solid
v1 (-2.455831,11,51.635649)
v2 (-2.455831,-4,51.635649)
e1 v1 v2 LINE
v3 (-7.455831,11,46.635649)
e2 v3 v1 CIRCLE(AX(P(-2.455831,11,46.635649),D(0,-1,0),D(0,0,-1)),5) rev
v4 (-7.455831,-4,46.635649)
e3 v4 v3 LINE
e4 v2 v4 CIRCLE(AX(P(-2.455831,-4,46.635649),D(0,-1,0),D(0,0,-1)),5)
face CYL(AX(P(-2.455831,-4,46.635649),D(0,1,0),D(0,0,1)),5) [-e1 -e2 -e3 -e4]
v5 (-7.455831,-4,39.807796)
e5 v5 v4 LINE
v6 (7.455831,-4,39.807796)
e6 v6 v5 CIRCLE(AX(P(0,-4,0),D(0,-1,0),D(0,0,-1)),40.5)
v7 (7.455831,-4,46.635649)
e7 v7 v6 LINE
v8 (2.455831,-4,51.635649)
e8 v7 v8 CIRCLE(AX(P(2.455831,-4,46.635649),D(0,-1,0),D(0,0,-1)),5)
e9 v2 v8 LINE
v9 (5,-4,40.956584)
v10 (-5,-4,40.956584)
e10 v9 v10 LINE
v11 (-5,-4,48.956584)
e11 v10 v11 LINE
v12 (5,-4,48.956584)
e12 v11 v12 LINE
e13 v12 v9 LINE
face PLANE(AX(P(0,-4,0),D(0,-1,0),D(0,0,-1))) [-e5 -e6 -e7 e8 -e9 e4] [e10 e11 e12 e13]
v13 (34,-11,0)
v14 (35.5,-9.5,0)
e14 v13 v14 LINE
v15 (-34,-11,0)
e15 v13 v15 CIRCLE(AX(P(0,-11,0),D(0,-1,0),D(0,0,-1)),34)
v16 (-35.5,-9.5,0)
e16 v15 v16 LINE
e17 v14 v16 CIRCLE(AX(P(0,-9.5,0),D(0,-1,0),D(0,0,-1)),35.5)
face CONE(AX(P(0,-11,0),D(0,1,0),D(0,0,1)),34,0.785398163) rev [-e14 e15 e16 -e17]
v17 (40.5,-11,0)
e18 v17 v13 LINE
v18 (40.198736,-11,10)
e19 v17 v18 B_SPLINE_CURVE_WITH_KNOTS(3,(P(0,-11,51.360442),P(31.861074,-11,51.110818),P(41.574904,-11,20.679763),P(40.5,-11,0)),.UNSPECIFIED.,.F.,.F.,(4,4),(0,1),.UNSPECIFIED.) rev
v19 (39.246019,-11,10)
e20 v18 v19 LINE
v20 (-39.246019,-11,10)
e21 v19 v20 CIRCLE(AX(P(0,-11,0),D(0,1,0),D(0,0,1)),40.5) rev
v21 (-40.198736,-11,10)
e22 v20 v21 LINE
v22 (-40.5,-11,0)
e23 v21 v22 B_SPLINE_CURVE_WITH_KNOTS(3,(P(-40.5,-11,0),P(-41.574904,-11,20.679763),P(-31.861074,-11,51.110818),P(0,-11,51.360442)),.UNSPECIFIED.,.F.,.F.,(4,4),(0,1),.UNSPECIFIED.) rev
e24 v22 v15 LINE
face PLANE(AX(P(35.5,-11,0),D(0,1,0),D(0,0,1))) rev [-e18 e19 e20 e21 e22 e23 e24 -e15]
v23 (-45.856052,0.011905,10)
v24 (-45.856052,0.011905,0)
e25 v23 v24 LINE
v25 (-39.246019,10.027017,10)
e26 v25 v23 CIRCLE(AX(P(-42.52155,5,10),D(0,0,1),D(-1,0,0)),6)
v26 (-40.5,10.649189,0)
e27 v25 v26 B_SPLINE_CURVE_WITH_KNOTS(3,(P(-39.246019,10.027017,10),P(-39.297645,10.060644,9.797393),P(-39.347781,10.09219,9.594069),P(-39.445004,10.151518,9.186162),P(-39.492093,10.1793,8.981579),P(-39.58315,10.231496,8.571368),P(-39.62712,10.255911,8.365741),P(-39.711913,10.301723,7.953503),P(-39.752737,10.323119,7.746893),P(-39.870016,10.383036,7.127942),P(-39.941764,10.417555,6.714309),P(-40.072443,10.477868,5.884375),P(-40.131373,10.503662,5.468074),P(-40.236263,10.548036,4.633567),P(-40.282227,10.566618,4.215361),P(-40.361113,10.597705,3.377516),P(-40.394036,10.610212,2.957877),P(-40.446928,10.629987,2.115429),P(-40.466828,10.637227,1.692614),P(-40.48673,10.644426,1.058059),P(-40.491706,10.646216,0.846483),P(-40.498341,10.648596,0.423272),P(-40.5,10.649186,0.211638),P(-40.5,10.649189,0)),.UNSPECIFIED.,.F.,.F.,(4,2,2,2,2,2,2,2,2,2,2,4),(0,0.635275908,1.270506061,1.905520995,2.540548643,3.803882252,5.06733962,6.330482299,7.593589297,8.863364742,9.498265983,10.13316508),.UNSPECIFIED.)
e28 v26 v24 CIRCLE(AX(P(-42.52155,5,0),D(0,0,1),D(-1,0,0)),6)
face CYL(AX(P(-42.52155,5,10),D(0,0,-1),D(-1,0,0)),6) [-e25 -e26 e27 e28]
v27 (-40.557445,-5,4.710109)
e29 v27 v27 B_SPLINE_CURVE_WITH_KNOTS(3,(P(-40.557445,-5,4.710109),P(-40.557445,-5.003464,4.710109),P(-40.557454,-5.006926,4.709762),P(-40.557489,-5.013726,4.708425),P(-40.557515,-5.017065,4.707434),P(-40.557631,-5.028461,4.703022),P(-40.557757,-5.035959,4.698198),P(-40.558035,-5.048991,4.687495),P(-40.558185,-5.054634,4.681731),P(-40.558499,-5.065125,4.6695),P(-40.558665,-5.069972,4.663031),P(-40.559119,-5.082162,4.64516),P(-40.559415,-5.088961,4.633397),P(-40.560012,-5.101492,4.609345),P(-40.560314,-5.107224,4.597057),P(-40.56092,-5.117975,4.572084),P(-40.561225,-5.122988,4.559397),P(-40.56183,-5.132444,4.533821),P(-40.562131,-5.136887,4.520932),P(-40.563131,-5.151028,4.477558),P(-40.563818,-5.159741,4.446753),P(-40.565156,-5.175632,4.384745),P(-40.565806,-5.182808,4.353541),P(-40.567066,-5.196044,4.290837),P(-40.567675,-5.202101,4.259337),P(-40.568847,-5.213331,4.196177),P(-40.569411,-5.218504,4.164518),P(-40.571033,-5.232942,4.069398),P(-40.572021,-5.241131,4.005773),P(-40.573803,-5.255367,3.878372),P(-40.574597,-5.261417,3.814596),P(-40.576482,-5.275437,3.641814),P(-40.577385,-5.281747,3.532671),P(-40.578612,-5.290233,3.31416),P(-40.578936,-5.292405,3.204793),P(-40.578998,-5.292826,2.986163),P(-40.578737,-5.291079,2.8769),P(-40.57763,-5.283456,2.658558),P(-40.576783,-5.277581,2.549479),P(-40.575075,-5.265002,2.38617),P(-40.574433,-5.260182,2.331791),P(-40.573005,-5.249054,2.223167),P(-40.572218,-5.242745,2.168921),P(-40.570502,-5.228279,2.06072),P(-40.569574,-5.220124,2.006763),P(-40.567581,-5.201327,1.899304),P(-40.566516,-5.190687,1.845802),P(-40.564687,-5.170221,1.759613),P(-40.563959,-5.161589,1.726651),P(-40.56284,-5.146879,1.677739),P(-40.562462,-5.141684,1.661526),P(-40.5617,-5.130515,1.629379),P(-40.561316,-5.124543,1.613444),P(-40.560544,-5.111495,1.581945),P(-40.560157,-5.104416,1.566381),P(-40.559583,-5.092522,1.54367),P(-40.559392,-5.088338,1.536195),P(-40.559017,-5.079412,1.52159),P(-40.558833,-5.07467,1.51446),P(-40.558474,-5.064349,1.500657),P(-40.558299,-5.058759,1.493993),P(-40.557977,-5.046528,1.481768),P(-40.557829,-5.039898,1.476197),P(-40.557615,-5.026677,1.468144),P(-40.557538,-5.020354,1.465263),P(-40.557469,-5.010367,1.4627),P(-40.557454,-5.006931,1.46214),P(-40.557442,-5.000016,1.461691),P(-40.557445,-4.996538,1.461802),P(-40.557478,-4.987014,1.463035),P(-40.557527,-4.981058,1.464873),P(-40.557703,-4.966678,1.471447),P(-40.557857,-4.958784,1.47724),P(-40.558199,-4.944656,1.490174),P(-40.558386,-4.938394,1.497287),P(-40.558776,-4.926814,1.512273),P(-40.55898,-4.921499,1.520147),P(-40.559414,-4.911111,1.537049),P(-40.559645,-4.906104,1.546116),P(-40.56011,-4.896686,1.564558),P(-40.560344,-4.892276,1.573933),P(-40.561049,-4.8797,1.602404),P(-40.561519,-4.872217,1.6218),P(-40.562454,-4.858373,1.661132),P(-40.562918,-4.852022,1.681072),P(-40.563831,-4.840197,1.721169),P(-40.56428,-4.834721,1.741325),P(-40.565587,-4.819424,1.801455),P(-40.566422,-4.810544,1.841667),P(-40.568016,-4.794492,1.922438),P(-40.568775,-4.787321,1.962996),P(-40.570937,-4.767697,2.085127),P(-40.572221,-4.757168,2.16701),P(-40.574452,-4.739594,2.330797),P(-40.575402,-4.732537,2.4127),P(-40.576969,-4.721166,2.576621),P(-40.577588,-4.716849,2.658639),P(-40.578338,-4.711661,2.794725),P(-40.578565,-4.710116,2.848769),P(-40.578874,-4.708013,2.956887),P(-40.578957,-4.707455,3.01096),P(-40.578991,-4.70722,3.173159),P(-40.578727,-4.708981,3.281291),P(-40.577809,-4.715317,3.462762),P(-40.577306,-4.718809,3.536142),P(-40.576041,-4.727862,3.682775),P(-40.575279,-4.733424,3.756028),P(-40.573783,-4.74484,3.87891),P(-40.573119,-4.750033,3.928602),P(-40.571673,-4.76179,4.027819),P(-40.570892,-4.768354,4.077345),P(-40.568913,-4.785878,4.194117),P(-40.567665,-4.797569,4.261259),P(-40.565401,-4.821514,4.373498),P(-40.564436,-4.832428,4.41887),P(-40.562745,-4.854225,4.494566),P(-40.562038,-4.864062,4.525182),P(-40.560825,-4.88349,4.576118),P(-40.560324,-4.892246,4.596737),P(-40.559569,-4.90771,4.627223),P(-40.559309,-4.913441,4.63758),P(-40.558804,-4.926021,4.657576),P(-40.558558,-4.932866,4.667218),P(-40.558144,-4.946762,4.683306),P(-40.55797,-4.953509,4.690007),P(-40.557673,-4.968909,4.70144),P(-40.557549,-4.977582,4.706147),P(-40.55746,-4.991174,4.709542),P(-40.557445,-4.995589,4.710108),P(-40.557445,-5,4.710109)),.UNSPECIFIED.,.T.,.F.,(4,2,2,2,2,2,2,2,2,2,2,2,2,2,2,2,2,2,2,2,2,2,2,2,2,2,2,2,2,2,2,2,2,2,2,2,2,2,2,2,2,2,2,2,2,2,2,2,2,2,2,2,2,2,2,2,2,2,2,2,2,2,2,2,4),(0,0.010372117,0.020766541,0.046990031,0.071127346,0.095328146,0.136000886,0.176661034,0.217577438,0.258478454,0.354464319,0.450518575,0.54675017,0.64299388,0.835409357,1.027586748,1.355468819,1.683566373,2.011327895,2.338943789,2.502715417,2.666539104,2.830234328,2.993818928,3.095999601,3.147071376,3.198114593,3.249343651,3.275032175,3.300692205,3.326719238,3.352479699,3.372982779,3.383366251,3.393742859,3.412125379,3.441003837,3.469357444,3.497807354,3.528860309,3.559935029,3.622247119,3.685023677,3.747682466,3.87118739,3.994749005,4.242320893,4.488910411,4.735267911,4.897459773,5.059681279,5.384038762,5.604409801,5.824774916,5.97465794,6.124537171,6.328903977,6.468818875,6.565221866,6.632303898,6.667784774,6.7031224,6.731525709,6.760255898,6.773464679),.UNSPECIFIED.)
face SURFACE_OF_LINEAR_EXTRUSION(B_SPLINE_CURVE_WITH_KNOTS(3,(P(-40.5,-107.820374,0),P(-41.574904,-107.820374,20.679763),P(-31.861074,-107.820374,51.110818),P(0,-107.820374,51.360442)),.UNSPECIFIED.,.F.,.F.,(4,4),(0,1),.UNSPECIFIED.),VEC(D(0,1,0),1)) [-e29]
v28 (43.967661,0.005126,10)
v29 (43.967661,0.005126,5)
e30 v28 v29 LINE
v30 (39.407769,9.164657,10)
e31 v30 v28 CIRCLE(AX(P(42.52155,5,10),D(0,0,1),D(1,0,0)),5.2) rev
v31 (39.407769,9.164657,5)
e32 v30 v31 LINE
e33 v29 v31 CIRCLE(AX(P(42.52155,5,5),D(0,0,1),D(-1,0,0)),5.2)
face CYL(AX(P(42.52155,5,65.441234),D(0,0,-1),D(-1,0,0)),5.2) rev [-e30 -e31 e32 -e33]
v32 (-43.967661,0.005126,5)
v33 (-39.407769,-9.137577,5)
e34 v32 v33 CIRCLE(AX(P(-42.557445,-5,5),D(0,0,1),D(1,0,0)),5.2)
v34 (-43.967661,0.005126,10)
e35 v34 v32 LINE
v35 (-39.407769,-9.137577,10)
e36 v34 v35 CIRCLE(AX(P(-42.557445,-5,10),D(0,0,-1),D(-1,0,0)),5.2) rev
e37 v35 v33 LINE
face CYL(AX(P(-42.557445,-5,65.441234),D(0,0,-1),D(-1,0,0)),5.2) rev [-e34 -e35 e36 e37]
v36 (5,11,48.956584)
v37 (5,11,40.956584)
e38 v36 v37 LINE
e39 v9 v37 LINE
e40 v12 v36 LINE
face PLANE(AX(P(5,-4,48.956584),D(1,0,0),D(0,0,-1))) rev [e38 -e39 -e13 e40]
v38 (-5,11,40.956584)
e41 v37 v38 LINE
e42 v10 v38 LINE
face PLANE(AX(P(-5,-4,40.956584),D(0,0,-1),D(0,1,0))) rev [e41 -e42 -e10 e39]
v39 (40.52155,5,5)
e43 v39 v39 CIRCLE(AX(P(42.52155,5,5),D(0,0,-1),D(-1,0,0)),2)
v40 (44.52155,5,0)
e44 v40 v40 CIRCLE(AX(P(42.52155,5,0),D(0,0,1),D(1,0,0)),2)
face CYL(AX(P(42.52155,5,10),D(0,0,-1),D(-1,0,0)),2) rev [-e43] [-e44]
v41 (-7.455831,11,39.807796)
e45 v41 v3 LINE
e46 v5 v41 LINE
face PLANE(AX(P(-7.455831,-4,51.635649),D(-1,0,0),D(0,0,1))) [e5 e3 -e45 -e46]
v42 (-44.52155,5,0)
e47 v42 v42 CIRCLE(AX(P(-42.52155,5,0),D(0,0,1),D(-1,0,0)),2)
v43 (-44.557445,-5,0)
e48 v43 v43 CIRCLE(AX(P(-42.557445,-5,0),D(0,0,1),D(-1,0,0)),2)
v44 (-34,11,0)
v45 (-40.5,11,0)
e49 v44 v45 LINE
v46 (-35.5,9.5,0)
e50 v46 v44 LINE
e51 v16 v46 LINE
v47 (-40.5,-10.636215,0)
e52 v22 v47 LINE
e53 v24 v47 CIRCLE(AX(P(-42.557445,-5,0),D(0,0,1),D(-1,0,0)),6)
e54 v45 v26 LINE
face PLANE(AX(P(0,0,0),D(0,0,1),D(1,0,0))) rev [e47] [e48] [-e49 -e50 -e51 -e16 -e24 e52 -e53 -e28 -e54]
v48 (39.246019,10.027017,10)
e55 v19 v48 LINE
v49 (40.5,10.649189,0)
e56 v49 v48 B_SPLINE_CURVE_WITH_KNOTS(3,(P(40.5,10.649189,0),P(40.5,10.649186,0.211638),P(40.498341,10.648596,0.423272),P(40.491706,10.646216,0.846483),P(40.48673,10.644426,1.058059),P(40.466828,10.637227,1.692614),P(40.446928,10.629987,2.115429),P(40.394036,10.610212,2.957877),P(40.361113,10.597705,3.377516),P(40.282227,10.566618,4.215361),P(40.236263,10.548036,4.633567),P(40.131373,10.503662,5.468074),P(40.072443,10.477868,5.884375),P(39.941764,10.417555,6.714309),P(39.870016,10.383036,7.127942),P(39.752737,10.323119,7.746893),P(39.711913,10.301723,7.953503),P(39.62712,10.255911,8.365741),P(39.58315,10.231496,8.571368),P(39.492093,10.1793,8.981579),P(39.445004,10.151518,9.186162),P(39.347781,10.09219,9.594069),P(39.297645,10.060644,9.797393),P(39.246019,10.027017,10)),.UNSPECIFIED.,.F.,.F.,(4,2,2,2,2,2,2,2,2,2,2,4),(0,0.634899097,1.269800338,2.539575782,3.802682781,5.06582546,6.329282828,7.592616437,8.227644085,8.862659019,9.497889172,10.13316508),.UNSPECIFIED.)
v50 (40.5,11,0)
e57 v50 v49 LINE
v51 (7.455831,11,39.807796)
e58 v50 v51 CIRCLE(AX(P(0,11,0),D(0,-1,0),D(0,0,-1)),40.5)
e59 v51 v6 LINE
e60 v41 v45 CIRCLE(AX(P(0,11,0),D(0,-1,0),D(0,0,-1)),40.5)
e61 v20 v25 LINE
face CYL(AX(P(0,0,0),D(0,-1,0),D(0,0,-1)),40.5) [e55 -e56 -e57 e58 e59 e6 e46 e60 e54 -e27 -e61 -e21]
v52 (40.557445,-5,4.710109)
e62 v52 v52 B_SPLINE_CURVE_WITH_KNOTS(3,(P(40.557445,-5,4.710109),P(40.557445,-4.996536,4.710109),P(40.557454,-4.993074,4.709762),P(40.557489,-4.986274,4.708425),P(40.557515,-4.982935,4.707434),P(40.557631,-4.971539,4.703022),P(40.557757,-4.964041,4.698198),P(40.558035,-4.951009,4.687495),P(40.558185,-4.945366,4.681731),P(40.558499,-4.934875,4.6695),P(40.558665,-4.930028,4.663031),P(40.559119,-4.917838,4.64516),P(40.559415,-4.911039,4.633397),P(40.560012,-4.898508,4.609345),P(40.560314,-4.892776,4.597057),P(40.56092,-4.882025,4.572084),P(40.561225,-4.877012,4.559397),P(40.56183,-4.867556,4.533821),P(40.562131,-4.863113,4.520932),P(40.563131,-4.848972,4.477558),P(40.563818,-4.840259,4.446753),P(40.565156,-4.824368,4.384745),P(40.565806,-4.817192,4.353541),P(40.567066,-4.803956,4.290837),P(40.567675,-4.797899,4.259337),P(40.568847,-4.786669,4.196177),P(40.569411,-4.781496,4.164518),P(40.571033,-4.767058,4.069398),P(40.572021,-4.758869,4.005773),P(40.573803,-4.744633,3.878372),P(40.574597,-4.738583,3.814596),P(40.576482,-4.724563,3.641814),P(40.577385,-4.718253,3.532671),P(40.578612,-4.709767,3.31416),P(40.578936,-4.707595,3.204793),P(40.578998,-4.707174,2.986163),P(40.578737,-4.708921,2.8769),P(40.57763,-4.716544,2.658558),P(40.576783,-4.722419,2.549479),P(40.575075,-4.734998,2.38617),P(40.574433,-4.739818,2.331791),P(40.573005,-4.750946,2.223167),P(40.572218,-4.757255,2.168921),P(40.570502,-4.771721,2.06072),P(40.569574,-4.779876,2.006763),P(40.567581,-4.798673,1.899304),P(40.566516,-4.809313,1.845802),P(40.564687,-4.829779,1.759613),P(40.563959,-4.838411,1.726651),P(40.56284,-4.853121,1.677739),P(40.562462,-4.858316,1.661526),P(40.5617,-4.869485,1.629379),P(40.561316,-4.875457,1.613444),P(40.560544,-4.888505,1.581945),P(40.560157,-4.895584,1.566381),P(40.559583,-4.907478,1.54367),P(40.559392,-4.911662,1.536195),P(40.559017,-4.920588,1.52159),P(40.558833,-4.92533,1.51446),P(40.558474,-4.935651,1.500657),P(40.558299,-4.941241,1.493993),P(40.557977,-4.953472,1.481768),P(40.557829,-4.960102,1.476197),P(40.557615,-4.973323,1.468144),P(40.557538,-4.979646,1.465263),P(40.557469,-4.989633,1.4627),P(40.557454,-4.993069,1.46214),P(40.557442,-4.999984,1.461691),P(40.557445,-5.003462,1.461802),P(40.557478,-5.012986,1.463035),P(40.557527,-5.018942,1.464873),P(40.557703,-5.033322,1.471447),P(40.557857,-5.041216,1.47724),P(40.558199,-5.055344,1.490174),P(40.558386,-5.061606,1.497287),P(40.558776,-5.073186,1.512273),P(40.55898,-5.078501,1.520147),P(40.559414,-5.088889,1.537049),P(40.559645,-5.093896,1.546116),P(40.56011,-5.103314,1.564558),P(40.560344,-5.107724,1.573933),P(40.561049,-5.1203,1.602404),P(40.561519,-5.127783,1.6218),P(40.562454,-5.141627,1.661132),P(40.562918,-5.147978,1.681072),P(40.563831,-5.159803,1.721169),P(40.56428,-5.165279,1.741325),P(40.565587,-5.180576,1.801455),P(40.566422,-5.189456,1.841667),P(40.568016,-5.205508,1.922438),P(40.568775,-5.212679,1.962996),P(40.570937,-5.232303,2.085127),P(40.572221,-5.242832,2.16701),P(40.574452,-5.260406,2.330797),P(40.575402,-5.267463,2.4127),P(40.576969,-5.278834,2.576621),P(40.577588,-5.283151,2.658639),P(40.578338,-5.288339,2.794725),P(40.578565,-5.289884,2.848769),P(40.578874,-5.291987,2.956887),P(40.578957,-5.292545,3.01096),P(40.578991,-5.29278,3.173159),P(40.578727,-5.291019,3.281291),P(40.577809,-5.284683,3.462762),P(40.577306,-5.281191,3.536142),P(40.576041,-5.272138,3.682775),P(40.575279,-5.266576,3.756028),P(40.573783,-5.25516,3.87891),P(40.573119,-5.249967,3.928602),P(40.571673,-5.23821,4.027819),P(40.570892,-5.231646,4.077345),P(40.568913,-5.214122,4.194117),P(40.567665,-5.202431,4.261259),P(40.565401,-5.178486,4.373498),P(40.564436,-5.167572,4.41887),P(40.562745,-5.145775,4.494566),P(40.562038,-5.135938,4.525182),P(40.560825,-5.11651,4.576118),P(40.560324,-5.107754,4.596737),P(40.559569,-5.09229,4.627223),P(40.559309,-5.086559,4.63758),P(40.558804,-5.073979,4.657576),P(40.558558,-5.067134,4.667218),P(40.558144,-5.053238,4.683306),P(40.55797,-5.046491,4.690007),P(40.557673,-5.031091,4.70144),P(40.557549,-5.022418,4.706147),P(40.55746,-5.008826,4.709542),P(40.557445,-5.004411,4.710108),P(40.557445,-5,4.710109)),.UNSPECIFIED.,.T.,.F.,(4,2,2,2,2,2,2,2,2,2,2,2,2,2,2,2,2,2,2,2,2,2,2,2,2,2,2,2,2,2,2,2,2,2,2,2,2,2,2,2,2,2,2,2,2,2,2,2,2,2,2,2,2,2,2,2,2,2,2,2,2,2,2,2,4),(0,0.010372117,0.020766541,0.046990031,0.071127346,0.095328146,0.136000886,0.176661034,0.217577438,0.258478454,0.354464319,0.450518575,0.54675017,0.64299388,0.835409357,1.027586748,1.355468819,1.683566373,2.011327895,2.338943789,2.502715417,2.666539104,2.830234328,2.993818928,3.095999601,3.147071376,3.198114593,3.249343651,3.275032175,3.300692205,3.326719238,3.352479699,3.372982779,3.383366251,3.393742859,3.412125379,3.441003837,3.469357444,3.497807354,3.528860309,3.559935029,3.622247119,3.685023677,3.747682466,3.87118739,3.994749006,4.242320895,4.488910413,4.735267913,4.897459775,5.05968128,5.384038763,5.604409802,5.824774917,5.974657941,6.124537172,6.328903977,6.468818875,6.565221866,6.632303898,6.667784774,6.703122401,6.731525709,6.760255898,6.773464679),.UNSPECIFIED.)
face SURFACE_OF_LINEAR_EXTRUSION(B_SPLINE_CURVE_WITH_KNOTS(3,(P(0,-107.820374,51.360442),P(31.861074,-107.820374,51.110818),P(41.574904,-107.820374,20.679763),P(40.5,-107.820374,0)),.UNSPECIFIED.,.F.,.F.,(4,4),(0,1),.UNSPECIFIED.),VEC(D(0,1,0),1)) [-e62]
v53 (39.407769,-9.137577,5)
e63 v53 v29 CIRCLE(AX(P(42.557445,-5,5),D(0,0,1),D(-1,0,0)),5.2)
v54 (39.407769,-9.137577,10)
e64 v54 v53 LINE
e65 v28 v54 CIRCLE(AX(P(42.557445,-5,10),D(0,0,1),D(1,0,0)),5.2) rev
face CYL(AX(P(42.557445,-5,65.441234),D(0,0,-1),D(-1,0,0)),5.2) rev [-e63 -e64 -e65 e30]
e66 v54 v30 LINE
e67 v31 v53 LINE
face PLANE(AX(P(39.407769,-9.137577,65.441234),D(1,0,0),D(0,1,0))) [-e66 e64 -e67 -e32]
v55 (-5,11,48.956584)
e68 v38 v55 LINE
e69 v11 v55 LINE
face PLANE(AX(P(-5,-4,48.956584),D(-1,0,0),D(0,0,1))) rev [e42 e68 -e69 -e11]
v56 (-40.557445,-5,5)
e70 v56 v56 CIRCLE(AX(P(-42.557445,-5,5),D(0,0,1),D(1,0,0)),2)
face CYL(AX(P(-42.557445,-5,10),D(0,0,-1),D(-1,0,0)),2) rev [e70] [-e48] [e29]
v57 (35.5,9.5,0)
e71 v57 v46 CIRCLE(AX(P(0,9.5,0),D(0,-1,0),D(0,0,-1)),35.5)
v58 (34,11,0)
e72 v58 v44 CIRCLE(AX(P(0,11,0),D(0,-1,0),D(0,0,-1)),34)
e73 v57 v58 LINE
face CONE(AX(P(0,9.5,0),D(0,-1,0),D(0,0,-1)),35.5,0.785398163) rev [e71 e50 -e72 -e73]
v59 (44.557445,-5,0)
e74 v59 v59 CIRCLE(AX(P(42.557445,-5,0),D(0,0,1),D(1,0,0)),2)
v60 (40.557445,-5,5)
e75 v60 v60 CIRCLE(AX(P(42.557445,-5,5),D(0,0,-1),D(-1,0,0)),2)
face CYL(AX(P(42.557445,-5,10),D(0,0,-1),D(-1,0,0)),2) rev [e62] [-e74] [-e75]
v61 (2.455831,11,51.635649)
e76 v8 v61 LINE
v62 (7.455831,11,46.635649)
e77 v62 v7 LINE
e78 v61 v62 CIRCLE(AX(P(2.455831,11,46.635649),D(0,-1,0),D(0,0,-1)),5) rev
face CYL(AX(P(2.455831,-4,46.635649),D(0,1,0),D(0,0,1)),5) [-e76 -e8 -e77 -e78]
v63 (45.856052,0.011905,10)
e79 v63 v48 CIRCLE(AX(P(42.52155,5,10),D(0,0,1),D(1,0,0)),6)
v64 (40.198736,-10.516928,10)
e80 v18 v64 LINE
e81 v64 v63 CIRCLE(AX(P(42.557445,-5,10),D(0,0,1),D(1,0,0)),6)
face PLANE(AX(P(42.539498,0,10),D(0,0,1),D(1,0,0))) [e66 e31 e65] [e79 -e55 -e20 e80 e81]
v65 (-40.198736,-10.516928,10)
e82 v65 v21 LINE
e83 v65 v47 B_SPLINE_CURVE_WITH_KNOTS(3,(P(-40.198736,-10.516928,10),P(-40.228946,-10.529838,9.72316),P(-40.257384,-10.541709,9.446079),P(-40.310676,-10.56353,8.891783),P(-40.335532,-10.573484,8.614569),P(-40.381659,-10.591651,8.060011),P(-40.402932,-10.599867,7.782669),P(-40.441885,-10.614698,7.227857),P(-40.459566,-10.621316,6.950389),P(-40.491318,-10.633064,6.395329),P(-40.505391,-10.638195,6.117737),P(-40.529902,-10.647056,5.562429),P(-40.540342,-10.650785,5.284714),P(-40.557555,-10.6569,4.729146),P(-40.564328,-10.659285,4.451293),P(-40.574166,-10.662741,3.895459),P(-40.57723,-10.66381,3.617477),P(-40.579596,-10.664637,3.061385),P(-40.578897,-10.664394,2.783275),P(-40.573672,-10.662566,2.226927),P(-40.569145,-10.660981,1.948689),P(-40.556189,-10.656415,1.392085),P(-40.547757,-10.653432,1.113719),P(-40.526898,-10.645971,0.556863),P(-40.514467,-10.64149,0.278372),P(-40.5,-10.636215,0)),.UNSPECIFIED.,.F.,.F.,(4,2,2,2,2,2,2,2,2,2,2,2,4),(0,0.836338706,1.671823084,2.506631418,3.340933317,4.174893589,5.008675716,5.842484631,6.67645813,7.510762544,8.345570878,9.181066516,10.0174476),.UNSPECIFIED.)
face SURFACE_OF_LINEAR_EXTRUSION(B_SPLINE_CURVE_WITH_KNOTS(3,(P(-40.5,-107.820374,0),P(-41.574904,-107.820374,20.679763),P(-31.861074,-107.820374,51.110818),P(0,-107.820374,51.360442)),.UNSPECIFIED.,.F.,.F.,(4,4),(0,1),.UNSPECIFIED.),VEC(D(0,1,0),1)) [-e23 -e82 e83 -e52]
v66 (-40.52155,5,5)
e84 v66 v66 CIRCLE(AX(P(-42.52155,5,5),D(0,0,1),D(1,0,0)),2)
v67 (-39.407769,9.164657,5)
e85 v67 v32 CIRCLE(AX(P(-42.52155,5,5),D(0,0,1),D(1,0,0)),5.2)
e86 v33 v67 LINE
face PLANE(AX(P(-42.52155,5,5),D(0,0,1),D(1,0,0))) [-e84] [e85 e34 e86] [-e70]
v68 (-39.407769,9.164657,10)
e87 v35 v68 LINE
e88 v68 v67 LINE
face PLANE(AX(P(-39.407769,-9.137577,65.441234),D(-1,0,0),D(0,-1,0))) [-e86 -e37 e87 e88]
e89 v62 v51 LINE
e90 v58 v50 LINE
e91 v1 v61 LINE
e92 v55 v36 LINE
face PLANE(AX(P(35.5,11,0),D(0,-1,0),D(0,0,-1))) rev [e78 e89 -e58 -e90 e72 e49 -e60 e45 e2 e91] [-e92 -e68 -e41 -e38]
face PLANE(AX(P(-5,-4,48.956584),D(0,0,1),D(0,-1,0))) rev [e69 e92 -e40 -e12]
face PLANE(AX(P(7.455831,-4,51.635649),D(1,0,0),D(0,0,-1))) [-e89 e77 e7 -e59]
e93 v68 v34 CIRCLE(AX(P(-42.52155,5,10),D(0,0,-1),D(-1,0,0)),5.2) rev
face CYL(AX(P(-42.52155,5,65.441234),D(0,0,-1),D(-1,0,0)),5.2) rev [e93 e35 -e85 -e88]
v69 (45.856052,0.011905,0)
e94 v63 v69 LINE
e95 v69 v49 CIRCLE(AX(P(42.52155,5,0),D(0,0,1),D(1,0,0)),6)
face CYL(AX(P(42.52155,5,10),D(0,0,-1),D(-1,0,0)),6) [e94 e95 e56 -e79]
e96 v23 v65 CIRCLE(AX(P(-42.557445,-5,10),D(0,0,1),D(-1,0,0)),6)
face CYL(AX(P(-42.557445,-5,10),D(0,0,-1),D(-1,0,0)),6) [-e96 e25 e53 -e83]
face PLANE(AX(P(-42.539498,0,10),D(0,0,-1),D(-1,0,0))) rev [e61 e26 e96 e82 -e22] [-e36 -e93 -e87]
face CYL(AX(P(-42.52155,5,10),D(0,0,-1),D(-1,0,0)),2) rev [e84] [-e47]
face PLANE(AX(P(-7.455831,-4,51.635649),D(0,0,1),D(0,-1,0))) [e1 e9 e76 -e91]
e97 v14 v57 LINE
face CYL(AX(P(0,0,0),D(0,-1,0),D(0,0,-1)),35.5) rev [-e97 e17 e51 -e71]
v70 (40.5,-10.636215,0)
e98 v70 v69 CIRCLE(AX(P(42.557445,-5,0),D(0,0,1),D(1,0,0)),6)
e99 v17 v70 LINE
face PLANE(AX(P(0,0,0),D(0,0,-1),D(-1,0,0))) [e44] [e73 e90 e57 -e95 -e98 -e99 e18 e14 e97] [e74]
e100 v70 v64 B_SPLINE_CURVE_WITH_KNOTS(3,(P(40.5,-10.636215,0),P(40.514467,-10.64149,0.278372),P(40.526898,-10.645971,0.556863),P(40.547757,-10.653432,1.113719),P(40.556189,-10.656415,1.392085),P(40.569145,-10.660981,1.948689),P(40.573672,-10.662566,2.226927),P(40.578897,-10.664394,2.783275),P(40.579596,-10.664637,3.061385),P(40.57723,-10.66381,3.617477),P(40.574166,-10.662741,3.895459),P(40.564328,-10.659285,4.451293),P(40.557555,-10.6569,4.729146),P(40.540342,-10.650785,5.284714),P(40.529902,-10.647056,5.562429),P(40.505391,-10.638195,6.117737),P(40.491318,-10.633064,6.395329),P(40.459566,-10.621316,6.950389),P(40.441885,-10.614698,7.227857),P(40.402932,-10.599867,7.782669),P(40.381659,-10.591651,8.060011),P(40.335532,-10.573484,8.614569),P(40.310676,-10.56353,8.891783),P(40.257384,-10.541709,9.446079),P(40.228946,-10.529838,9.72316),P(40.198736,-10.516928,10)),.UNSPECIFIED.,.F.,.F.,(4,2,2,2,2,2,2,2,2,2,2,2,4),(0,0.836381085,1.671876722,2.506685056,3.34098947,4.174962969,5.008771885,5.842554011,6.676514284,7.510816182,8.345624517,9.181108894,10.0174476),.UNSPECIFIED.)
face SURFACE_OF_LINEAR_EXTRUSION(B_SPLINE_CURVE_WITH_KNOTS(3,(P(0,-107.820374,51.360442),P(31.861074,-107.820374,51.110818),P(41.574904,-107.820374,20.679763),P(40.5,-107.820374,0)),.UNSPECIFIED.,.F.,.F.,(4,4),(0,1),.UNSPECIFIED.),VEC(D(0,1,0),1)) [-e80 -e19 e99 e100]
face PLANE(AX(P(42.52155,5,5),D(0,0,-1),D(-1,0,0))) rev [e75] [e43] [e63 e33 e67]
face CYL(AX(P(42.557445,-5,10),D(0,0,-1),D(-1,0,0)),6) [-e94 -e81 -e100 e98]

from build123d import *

# Parameters (mm, degrees)
REVOLVE1_ANGLE                  = 180
BOSS_EXTRUDE1_START             = -11
BOSS_EXTRUDE1_DEPTH             = 11
CUT_EXTRUDE1_REACH              = 68.374
BOSS_EXTRUDE2_REACH             = 67.327
BOSS_EXTRUDE2_END_RADIUS        = 40.5
SKETCH6_W                       = 25.4
SKETCH6_H                       = 18
BOSS_EXTRUDE2_DIRECTION_2_DEPTH = 15
SKETCH8_W                       = 4
SKETCH8_H                       = 19.884534
CUT_EXTRUDE3_DEPTH              = 80.722348
FILLET1_START                   = 2
FILLET1_DEPTH                   = 5
FILLET1_START_2                 = -11
FILLET1_2_DEPTH                 = 16.09884
FILLET1_START_3                 = 37
FILLET1_3_DEPTH                 = 28
FILLET1_START_4                 = 62
FILLET1_4_OUTLINE_W             = 4
FILLET1_4_OUTLINE_H             = 5
FILLET1_4_DEPTH                 = 3
FILLET1_START_5                 = 39.17071
FILLET1_5_OUTLINE_W             = 4
FILLET1_5_OUTLINE_H             = 5
FILLET1_5_DEPTH                 = 2.944756
FILLET1_6_DEPTH                 = 6
SKETCH9_R                       = 2
BOSS_EXTRUDE3_DEPTH             = 10
CUT_EXTRUDE4_DEPTH              = 75.187772
CUT_EXTRUDE4_DEPTH_BACK         = 5
CUT_EXTRUDE5_DEPTH              = 85.064413
SKETCH12_W                      = 14.911662
SKETCH12_H                      = 13.358131
SKETCH12_W_2                    = 10
SKETCH12_H_2                    = 8
BOSS_EXTRUDE4_DEPTH             = 15
FILLET2_R                       = 5


with BuildPart() as part:
    # Sketch2 → Revolve1 (revolve, symmetric)
    with BuildSketch(Plane(origin=(0, 0, 0), x_dir=(0, 0, -1), z_dir=(1, 0, 0))) as revolve1_sk:
        Polygon((-34, -11), (-35.5, -9.5), (-35.5, 9.5), (-34, 11), (-35.5, 11), (-40.5, 11), (-40.5, -11), (-35.5, -11), align=None)
    revolve(axis=Axis((0, 0, 0), (0, 1, 0)), revolution_arc=REVOLVE1_ANGLE / 2)
    revolve(revolve1_sk.sketch, axis=Axis((0, 0, 0), (0, -1, 0)), revolution_arc=REVOLVE1_ANGLE / 2)

    # Sketch3 → Boss-Extrude1 (add)
    with BuildSketch(Plane(origin=(0, 0, 0), x_dir=(1, 0, 0), z_dir=(0, 1, 0)).offset(BOSS_EXTRUDE1_START)):
        with BuildLine():
            ThreePointArc((-40.5, 0), (0, -40.5), (40.5, 0))
            add(Edge.make_bspline(
                [(40.5, 0), (41.574904, -20.679763), (31.861074, -51.110818), (0, -51.360442)],
                knots=[0, 0, 0, 0, 1, 1, 1, 1], degree=3))
            add(Edge.make_bspline(
                [(-40.5, 0), (-41.574904, -20.679763), (-31.861074, -51.110818), (0, -51.360442)],
                knots=[0, 0, 0, 0, 1, 1, 1, 1], degree=3))
        make_face()
    extrude(amount=BOSS_EXTRUDE1_DEPTH)

    # Sketch5 → Cut-Extrude1 (cut, up to next)
    with BuildSketch(Plane(origin=(0, 0, 0), x_dir=(1, 0, 0), z_dir=(0, 1, 0)), mode=Mode.PRIVATE) as cut_extrude1_sk1:
        Polygon((32.298595, -50), (-32.298595, -50), (-4.520904, -70.798059), align=None)
    cut_extrude1_tool1 = extrude(cut_extrude1_sk1.sketch, amount=-CUT_EXTRUDE1_REACH, mode=Mode.PRIVATE) & part.part
    add(cut_extrude1_tool1.solids().sort_by_distance((-1.506968, 0, 56.932686))[0], mode=Mode.SUBTRACT)

    # Boss-Extrude2: up to this cylinder (the profile starts outside it)
    boss_extrude2_end = Plane(origin=(0, -2, 0), z_dir=(0, -1, 0)) * Cylinder(BOSS_EXTRUDE2_END_RADIUS, 216.654, mode=Mode.PRIVATE)
    # Sketch6 → Boss-Extrude2 (add, up to the surface)
    with BuildSketch(Plane.XY.offset(50), mode=Mode.PRIVATE) as boss_extrude2_sk1:
        with Locations((0, -2)):
            Rectangle(SKETCH6_W, SKETCH6_H)
    boss_extrude2_tool1 = extrude(boss_extrude2_sk1.sketch, amount=-BOSS_EXTRUDE2_REACH, mode=Mode.PRIVATE) - boss_extrude2_end
    add(boss_extrude2_tool1.solids().sort_by_distance((0, -2, 50))[0])

    # Sketch6 → Boss-Extrude2 direction 2 (add)
    with BuildSketch(Plane.XY.offset(50)):
        with Locations((0, -2)):
            Rectangle(SKETCH6_W, SKETCH6_H)
    extrude(amount=BOSS_EXTRUDE2_DIRECTION_2_DEPTH)

    # Sketch8 → Cut-Extrude3 (cut, through all)
    with BuildSketch(Plane(origin=(0, 11, 0), x_dir=(1, 0, 0), z_dir=(0, 1, 0))):
        with BuildLine():
            Line((15.113165, -40.129156), (15.113165, -45.006528))
            add(Edge.make_bspline(
                [(15.113165, -45.006528), (20.553217, -43.096096), (30.745136, -32.716473), (33.442003, -26.840069)],
                knots=[0, 0, 0, 0, 1, 1, 1, 1], degree=3))
            ThreePointArc((33.442003, -26.840069), (25.17044, -34.716075), (15.113165, -40.129156))
        make_face()
        with BuildLine():
            Line((-15.113165, -40.129156), (-15.113165, -45.006528))
            add(Edge.make_bspline(
                [(-15.113165, -45.006528), (-20.553217, -43.096096), (-30.745136, -32.716473), (-33.442003, -26.840069)],
                knots=[0, 0, 0, 0, 1, 1, 1, 1], degree=3))
            ThreePointArc((-33.442003, -26.840069), (-25.17044, -34.716075), (-15.113165, -40.129156))
        make_face()
        with Locations((0, -52.057733)):
            Rectangle(SKETCH8_W, SKETCH8_H)
    extrude(amount=-CUT_EXTRUDE3_DEPTH, mode=Mode.SUBTRACT)

    # Fillet1: read off the stored shape, not the designer's step
    # Fillet1 outline → Fillet1 (cut)
    with BuildSketch(Plane(origin=(0, 0, 0), x_dir=(1, 0, 0), z_dir=(0, 1, 0)).offset(FILLET1_START)):
        with BuildLine():
            Line((-12.7, -65), (12.7, -65))
            Line((12.7, -65), (12.7, -38.457249))
            ThreePointArc((12.7, -38.457249), (0, -40.5), (-12.7, -38.457249))
            Line((-12.7, -38.457249), (-12.7, -65))
        make_face()
    extrude(amount=FILLET1_DEPTH, mode=Mode.SUBTRACT)

    # Fillet1 2 outline → Fillet1 2 (cut)
    with BuildSketch(Plane(origin=(0, 0, 0), x_dir=(1, 0, 0), z_dir=(0, 1, 0)).offset(FILLET1_START_2)):
        with BuildLine():
            Line((-12.7, -65), (-7.7, -65))
            add(Edge.make_bspline(
                [(-7.7, -65), (-12.7, -65), (-12.7, -60)],
                knots=[0, 0, 0, 1, 1, 1], degree=2, weights=[1, 0.707107, 1]))
            Line((-12.7, -60), (-12.7, -65))
        make_face()
        with BuildLine():
            add(Edge.make_bspline(
                [(7.7, -65), (12.7, -65), (12.7, -60)],
                knots=[0, 0, 0, 1, 1, 1], degree=2, weights=[1, 0.707107, 1]))
            Line((7.7, -65), (12.7, -65))
            Line((12.7, -65), (12.7, -60))
        make_face()
    extrude(amount=FILLET1_2_DEPTH, mode=Mode.SUBTRACT)

    # Fillet1 3 outline → Fillet1 3 (add)
    with BuildSketch(Plane.XY.offset(FILLET1_START_3)):
        with BuildLine():
            add(Edge.make_bspline(
                [(-12.7, 2), (-12.7, 7), (-7.7, 7)],
                knots=[0, 0, 0, 1, 1, 1], degree=2, weights=[1, 0.707107, 1]))
            Line((-12.7, 2), (-2, 2))
            Line((-2, 2), (-2, 7))
            Line((-2, 7), (-7.7, 7))
        make_face()
        with BuildLine():
            Line((2, 7), (2, 2))
            Line((2, 2), (12.7, 2))
            add(Edge.make_bspline(
                [(7.7, 7), (12.7, 7), (12.7, 2)],
                knots=[0, 0, 0, 1, 1, 1], degree=2, weights=[1, 0.707107, 1]))
            Line((7.7, 7), (2, 7))
        make_face()
    extrude(amount=FILLET1_3_DEPTH)

    # Fillet1 4 outline → Fillet1 4 (add)
    with BuildSketch(Plane.XY.offset(FILLET1_START_4)):
        with Locations((0, 4.5)):
            Rectangle(FILLET1_4_OUTLINE_W, FILLET1_4_OUTLINE_H)
    extrude(amount=FILLET1_4_DEPTH)

    # Fillet1 5 outline → Fillet1 5 (add)
    with BuildSketch(Plane.XY.offset(FILLET1_START_5)):
        with Locations((0, 4.5)):
            Rectangle(FILLET1_5_OUTLINE_W, FILLET1_5_OUTLINE_H)
    extrude(amount=FILLET1_5_DEPTH)

    # Fillet1 6 outline → Fillet1 6 (cut)
    with BuildSketch(Plane(origin=(0, 0, 0), x_dir=(1, 0, 0), z_dir=(0, 1, 0)).offset(FILLET1_START)):
        with BuildLine():
            Line((-12.7, -65), (-7.7, -65))
            add(Edge.make_bspline(
                [(-12.7, -60), (-12.7, -60.274102), (-12.679965, -60.548369), (-12.639842, -60.820553), (-12.536378, -61.284433), (-12.482162, -61.478121), (-12.41762, -61.668662), (-12.288664, -61.991396), (-12.22893, -62.125441), (-12.163988, -62.25706), (-11.922281, -62.702191), (-11.720174, -63.002028), (-11.490067, -63.281001), (-10.981001, -63.790067), (-10.702028, -64.020174), (-10.402191, -64.222281), (-9.95706, -64.463988), (-9.825441, -64.52893), (-9.691396, -64.588664), (-9.368662, -64.71762), (-9.178121, -64.782162), (-8.984433, -64.836378), (-8.520553, -64.939842), (-8.248369, -64.979965), (-7.974102, -65), (-7.7, -65)],
                knots=[0, 0, 0, 0, 0, 0.139857, 0.139857, 0.139857, 0.242164, 0.242164, 0.242164, 0.316823, 0.316823, 0.316823, 0.5, 0.5, 0.5, 0.683177, 0.683177, 0.683177, 0.757836, 0.757836, 0.757836, 0.860143, 0.860143, 0.860143, 1, 1, 1, 1, 1], degree=4))
            Line((-12.7, -60), (-12.7, -65))
        make_face()
        with BuildLine():
            Line((12.7, -65), (12.7, -60))
            add(Edge.make_bspline(
                [(12.7, -60), (12.7, -60.274102), (12.679965, -60.548369), (12.639842, -60.820553), (12.536378, -61.284433), (12.482162, -61.478121), (12.41762, -61.668662), (12.288664, -61.991396), (12.22893, -62.125441), (12.163988, -62.25706), (11.922281, -62.702191), (11.720174, -63.002028), (11.490067, -63.281001), (10.981001, -63.790067), (10.702028, -64.020174), (10.402191, -64.222281), (9.95706, -64.463988), (9.825441, -64.52893), (9.691396, -64.588664), (9.368662, -64.71762), (9.178121, -64.782162), (8.984433, -64.836378), (8.520553, -64.939842), (8.248369, -64.979965), (7.974102, -65), (7.7, -65)],
                knots=[0, 0, 0, 0, 0, 0.139857, 0.139857, 0.139857, 0.242164, 0.242164, 0.242164, 0.316823, 0.316823, 0.316823, 0.5, 0.5, 0.5, 0.683177, 0.683177, 0.683177, 0.757836, 0.757836, 0.757836, 0.860143, 0.860143, 0.860143, 1, 1, 1, 1, 1], degree=4))
            Line((7.7, -65), (12.7, -65))
        make_face()
    extrude(amount=FILLET1_6_DEPTH, mode=Mode.SUBTRACT)

    # Sketch9 → Boss-Extrude3 (add)
    # profile 1 of 2: a face of its own
    with BuildSketch(Plane.XY):
        with BuildLine():
            ThreePointArc((39.222943, -0.011905), (42.578982, -10.999961), (45.856052, 0.011905))
            ThreePointArc((45.856052, 0.011905), (42.500013, 10.999961), (39.222943, -0.011905))
        make_face()
        with Locations((42.557445, -5)):
            Circle(SKETCH9_R, mode=Mode.SUBTRACT)
        with Locations((42.52155, 5)):
            Circle(SKETCH9_R, mode=Mode.SUBTRACT)
    # profile 2 of 2: a face of its own
    with BuildSketch(Plane.XY):
        with BuildLine():
            ThreePointArc((-39.222943, -0.011905), (-42.578982, -10.999961), (-45.856052, 0.011905))
            ThreePointArc((-45.856052, 0.011905), (-42.500013, 10.999961), (-39.222943, -0.011905))
        make_face()
        with Locations(Location((-42.557445, -5, 0), (0, 0, 180))):
            Circle(SKETCH9_R, mode=Mode.SUBTRACT)
        with Locations(Location((-42.52155, 5, 0), (0, 0, 180))):
            Circle(SKETCH9_R, mode=Mode.SUBTRACT)
    extrude(amount=BOSS_EXTRUDE3_DEPTH)

    # Sketch10 → Cut-Extrude4 (cut, two sides: drawn at the far end of the back side and taken through both)
    with BuildSketch(Plane.XY.offset(10).offset(-CUT_EXTRUDE4_DEPTH_BACK)):
        with BuildLine():
            Line((39.407769, -9.137577), (39.407769, 9.164657))
            ThreePointArc((39.407769, 9.164657), (47.176604, 7.317427), (43.967661, 0.005126))
            ThreePointArc((43.967661, 0.005126), (47.210797, -7.320844), (39.407769, -9.137577))
        make_face()
        with BuildLine():
            Line((-39.407769, -9.137577), (-39.407769, 9.164657))
            ThreePointArc((-39.407769, 9.164657), (-47.176604, 7.317427), (-43.967661, 0.005126))
            ThreePointArc((-43.967661, 0.005126), (-47.210797, -7.320844), (-39.407769, -9.137577))
        make_face()
    extrude(amount=CUT_EXTRUDE4_DEPTH + CUT_EXTRUDE4_DEPTH_BACK, mode=Mode.SUBTRACT)

    # Sketch11 → Cut-Extrude5 (cut, through all)
    with BuildSketch(Plane(origin=(0, 11, 0), x_dir=(1, 0, 0), z_dir=(0, 1, 0))):
        with BuildLine():
            Line((48.52155, -10), (39.246019, -10))
            ThreePointArc((39.246019, -10), (0, -40.5), (-39.246019, -10))
            Line((-39.246019, -10), (-48.52155, -10))
            Line((-48.52155, -10), (-48.52155, -69.748878))
            Line((-48.52155, -69.748878), (48.52155, -69.748878))
            Line((48.52155, -69.748878), (48.52155, -10))
        make_face()
    extrude(amount=-CUT_EXTRUDE5_DEPTH, mode=Mode.SUBTRACT)

    # Sketch12 → Boss-Extrude4 (add)
    with BuildSketch(Plane(origin=(0, 11, 0), x_dir=(1, 0, 0), z_dir=(0, 1, 0))):
        with Locations((0, -44.956584)):
            Rectangle(SKETCH12_W, SKETCH12_H)
        with Locations((0, -44.956584)):
            Rectangle(SKETCH12_W_2, SKETCH12_H_2, mode=Mode.SUBTRACT)
    extrude(amount=-BOSS_EXTRUDE4_DEPTH)

    # Fillet2
    fillet2_edges = [part.edges().sort_by_distance(p)[0] for p in [
        (-7.455831, 3.5, 51.635649),
        (7.455831, 3.5, 51.635649),
    ]]
    fillet(fillet2_edges, radius=FILLET2_R)


solid = part.part
